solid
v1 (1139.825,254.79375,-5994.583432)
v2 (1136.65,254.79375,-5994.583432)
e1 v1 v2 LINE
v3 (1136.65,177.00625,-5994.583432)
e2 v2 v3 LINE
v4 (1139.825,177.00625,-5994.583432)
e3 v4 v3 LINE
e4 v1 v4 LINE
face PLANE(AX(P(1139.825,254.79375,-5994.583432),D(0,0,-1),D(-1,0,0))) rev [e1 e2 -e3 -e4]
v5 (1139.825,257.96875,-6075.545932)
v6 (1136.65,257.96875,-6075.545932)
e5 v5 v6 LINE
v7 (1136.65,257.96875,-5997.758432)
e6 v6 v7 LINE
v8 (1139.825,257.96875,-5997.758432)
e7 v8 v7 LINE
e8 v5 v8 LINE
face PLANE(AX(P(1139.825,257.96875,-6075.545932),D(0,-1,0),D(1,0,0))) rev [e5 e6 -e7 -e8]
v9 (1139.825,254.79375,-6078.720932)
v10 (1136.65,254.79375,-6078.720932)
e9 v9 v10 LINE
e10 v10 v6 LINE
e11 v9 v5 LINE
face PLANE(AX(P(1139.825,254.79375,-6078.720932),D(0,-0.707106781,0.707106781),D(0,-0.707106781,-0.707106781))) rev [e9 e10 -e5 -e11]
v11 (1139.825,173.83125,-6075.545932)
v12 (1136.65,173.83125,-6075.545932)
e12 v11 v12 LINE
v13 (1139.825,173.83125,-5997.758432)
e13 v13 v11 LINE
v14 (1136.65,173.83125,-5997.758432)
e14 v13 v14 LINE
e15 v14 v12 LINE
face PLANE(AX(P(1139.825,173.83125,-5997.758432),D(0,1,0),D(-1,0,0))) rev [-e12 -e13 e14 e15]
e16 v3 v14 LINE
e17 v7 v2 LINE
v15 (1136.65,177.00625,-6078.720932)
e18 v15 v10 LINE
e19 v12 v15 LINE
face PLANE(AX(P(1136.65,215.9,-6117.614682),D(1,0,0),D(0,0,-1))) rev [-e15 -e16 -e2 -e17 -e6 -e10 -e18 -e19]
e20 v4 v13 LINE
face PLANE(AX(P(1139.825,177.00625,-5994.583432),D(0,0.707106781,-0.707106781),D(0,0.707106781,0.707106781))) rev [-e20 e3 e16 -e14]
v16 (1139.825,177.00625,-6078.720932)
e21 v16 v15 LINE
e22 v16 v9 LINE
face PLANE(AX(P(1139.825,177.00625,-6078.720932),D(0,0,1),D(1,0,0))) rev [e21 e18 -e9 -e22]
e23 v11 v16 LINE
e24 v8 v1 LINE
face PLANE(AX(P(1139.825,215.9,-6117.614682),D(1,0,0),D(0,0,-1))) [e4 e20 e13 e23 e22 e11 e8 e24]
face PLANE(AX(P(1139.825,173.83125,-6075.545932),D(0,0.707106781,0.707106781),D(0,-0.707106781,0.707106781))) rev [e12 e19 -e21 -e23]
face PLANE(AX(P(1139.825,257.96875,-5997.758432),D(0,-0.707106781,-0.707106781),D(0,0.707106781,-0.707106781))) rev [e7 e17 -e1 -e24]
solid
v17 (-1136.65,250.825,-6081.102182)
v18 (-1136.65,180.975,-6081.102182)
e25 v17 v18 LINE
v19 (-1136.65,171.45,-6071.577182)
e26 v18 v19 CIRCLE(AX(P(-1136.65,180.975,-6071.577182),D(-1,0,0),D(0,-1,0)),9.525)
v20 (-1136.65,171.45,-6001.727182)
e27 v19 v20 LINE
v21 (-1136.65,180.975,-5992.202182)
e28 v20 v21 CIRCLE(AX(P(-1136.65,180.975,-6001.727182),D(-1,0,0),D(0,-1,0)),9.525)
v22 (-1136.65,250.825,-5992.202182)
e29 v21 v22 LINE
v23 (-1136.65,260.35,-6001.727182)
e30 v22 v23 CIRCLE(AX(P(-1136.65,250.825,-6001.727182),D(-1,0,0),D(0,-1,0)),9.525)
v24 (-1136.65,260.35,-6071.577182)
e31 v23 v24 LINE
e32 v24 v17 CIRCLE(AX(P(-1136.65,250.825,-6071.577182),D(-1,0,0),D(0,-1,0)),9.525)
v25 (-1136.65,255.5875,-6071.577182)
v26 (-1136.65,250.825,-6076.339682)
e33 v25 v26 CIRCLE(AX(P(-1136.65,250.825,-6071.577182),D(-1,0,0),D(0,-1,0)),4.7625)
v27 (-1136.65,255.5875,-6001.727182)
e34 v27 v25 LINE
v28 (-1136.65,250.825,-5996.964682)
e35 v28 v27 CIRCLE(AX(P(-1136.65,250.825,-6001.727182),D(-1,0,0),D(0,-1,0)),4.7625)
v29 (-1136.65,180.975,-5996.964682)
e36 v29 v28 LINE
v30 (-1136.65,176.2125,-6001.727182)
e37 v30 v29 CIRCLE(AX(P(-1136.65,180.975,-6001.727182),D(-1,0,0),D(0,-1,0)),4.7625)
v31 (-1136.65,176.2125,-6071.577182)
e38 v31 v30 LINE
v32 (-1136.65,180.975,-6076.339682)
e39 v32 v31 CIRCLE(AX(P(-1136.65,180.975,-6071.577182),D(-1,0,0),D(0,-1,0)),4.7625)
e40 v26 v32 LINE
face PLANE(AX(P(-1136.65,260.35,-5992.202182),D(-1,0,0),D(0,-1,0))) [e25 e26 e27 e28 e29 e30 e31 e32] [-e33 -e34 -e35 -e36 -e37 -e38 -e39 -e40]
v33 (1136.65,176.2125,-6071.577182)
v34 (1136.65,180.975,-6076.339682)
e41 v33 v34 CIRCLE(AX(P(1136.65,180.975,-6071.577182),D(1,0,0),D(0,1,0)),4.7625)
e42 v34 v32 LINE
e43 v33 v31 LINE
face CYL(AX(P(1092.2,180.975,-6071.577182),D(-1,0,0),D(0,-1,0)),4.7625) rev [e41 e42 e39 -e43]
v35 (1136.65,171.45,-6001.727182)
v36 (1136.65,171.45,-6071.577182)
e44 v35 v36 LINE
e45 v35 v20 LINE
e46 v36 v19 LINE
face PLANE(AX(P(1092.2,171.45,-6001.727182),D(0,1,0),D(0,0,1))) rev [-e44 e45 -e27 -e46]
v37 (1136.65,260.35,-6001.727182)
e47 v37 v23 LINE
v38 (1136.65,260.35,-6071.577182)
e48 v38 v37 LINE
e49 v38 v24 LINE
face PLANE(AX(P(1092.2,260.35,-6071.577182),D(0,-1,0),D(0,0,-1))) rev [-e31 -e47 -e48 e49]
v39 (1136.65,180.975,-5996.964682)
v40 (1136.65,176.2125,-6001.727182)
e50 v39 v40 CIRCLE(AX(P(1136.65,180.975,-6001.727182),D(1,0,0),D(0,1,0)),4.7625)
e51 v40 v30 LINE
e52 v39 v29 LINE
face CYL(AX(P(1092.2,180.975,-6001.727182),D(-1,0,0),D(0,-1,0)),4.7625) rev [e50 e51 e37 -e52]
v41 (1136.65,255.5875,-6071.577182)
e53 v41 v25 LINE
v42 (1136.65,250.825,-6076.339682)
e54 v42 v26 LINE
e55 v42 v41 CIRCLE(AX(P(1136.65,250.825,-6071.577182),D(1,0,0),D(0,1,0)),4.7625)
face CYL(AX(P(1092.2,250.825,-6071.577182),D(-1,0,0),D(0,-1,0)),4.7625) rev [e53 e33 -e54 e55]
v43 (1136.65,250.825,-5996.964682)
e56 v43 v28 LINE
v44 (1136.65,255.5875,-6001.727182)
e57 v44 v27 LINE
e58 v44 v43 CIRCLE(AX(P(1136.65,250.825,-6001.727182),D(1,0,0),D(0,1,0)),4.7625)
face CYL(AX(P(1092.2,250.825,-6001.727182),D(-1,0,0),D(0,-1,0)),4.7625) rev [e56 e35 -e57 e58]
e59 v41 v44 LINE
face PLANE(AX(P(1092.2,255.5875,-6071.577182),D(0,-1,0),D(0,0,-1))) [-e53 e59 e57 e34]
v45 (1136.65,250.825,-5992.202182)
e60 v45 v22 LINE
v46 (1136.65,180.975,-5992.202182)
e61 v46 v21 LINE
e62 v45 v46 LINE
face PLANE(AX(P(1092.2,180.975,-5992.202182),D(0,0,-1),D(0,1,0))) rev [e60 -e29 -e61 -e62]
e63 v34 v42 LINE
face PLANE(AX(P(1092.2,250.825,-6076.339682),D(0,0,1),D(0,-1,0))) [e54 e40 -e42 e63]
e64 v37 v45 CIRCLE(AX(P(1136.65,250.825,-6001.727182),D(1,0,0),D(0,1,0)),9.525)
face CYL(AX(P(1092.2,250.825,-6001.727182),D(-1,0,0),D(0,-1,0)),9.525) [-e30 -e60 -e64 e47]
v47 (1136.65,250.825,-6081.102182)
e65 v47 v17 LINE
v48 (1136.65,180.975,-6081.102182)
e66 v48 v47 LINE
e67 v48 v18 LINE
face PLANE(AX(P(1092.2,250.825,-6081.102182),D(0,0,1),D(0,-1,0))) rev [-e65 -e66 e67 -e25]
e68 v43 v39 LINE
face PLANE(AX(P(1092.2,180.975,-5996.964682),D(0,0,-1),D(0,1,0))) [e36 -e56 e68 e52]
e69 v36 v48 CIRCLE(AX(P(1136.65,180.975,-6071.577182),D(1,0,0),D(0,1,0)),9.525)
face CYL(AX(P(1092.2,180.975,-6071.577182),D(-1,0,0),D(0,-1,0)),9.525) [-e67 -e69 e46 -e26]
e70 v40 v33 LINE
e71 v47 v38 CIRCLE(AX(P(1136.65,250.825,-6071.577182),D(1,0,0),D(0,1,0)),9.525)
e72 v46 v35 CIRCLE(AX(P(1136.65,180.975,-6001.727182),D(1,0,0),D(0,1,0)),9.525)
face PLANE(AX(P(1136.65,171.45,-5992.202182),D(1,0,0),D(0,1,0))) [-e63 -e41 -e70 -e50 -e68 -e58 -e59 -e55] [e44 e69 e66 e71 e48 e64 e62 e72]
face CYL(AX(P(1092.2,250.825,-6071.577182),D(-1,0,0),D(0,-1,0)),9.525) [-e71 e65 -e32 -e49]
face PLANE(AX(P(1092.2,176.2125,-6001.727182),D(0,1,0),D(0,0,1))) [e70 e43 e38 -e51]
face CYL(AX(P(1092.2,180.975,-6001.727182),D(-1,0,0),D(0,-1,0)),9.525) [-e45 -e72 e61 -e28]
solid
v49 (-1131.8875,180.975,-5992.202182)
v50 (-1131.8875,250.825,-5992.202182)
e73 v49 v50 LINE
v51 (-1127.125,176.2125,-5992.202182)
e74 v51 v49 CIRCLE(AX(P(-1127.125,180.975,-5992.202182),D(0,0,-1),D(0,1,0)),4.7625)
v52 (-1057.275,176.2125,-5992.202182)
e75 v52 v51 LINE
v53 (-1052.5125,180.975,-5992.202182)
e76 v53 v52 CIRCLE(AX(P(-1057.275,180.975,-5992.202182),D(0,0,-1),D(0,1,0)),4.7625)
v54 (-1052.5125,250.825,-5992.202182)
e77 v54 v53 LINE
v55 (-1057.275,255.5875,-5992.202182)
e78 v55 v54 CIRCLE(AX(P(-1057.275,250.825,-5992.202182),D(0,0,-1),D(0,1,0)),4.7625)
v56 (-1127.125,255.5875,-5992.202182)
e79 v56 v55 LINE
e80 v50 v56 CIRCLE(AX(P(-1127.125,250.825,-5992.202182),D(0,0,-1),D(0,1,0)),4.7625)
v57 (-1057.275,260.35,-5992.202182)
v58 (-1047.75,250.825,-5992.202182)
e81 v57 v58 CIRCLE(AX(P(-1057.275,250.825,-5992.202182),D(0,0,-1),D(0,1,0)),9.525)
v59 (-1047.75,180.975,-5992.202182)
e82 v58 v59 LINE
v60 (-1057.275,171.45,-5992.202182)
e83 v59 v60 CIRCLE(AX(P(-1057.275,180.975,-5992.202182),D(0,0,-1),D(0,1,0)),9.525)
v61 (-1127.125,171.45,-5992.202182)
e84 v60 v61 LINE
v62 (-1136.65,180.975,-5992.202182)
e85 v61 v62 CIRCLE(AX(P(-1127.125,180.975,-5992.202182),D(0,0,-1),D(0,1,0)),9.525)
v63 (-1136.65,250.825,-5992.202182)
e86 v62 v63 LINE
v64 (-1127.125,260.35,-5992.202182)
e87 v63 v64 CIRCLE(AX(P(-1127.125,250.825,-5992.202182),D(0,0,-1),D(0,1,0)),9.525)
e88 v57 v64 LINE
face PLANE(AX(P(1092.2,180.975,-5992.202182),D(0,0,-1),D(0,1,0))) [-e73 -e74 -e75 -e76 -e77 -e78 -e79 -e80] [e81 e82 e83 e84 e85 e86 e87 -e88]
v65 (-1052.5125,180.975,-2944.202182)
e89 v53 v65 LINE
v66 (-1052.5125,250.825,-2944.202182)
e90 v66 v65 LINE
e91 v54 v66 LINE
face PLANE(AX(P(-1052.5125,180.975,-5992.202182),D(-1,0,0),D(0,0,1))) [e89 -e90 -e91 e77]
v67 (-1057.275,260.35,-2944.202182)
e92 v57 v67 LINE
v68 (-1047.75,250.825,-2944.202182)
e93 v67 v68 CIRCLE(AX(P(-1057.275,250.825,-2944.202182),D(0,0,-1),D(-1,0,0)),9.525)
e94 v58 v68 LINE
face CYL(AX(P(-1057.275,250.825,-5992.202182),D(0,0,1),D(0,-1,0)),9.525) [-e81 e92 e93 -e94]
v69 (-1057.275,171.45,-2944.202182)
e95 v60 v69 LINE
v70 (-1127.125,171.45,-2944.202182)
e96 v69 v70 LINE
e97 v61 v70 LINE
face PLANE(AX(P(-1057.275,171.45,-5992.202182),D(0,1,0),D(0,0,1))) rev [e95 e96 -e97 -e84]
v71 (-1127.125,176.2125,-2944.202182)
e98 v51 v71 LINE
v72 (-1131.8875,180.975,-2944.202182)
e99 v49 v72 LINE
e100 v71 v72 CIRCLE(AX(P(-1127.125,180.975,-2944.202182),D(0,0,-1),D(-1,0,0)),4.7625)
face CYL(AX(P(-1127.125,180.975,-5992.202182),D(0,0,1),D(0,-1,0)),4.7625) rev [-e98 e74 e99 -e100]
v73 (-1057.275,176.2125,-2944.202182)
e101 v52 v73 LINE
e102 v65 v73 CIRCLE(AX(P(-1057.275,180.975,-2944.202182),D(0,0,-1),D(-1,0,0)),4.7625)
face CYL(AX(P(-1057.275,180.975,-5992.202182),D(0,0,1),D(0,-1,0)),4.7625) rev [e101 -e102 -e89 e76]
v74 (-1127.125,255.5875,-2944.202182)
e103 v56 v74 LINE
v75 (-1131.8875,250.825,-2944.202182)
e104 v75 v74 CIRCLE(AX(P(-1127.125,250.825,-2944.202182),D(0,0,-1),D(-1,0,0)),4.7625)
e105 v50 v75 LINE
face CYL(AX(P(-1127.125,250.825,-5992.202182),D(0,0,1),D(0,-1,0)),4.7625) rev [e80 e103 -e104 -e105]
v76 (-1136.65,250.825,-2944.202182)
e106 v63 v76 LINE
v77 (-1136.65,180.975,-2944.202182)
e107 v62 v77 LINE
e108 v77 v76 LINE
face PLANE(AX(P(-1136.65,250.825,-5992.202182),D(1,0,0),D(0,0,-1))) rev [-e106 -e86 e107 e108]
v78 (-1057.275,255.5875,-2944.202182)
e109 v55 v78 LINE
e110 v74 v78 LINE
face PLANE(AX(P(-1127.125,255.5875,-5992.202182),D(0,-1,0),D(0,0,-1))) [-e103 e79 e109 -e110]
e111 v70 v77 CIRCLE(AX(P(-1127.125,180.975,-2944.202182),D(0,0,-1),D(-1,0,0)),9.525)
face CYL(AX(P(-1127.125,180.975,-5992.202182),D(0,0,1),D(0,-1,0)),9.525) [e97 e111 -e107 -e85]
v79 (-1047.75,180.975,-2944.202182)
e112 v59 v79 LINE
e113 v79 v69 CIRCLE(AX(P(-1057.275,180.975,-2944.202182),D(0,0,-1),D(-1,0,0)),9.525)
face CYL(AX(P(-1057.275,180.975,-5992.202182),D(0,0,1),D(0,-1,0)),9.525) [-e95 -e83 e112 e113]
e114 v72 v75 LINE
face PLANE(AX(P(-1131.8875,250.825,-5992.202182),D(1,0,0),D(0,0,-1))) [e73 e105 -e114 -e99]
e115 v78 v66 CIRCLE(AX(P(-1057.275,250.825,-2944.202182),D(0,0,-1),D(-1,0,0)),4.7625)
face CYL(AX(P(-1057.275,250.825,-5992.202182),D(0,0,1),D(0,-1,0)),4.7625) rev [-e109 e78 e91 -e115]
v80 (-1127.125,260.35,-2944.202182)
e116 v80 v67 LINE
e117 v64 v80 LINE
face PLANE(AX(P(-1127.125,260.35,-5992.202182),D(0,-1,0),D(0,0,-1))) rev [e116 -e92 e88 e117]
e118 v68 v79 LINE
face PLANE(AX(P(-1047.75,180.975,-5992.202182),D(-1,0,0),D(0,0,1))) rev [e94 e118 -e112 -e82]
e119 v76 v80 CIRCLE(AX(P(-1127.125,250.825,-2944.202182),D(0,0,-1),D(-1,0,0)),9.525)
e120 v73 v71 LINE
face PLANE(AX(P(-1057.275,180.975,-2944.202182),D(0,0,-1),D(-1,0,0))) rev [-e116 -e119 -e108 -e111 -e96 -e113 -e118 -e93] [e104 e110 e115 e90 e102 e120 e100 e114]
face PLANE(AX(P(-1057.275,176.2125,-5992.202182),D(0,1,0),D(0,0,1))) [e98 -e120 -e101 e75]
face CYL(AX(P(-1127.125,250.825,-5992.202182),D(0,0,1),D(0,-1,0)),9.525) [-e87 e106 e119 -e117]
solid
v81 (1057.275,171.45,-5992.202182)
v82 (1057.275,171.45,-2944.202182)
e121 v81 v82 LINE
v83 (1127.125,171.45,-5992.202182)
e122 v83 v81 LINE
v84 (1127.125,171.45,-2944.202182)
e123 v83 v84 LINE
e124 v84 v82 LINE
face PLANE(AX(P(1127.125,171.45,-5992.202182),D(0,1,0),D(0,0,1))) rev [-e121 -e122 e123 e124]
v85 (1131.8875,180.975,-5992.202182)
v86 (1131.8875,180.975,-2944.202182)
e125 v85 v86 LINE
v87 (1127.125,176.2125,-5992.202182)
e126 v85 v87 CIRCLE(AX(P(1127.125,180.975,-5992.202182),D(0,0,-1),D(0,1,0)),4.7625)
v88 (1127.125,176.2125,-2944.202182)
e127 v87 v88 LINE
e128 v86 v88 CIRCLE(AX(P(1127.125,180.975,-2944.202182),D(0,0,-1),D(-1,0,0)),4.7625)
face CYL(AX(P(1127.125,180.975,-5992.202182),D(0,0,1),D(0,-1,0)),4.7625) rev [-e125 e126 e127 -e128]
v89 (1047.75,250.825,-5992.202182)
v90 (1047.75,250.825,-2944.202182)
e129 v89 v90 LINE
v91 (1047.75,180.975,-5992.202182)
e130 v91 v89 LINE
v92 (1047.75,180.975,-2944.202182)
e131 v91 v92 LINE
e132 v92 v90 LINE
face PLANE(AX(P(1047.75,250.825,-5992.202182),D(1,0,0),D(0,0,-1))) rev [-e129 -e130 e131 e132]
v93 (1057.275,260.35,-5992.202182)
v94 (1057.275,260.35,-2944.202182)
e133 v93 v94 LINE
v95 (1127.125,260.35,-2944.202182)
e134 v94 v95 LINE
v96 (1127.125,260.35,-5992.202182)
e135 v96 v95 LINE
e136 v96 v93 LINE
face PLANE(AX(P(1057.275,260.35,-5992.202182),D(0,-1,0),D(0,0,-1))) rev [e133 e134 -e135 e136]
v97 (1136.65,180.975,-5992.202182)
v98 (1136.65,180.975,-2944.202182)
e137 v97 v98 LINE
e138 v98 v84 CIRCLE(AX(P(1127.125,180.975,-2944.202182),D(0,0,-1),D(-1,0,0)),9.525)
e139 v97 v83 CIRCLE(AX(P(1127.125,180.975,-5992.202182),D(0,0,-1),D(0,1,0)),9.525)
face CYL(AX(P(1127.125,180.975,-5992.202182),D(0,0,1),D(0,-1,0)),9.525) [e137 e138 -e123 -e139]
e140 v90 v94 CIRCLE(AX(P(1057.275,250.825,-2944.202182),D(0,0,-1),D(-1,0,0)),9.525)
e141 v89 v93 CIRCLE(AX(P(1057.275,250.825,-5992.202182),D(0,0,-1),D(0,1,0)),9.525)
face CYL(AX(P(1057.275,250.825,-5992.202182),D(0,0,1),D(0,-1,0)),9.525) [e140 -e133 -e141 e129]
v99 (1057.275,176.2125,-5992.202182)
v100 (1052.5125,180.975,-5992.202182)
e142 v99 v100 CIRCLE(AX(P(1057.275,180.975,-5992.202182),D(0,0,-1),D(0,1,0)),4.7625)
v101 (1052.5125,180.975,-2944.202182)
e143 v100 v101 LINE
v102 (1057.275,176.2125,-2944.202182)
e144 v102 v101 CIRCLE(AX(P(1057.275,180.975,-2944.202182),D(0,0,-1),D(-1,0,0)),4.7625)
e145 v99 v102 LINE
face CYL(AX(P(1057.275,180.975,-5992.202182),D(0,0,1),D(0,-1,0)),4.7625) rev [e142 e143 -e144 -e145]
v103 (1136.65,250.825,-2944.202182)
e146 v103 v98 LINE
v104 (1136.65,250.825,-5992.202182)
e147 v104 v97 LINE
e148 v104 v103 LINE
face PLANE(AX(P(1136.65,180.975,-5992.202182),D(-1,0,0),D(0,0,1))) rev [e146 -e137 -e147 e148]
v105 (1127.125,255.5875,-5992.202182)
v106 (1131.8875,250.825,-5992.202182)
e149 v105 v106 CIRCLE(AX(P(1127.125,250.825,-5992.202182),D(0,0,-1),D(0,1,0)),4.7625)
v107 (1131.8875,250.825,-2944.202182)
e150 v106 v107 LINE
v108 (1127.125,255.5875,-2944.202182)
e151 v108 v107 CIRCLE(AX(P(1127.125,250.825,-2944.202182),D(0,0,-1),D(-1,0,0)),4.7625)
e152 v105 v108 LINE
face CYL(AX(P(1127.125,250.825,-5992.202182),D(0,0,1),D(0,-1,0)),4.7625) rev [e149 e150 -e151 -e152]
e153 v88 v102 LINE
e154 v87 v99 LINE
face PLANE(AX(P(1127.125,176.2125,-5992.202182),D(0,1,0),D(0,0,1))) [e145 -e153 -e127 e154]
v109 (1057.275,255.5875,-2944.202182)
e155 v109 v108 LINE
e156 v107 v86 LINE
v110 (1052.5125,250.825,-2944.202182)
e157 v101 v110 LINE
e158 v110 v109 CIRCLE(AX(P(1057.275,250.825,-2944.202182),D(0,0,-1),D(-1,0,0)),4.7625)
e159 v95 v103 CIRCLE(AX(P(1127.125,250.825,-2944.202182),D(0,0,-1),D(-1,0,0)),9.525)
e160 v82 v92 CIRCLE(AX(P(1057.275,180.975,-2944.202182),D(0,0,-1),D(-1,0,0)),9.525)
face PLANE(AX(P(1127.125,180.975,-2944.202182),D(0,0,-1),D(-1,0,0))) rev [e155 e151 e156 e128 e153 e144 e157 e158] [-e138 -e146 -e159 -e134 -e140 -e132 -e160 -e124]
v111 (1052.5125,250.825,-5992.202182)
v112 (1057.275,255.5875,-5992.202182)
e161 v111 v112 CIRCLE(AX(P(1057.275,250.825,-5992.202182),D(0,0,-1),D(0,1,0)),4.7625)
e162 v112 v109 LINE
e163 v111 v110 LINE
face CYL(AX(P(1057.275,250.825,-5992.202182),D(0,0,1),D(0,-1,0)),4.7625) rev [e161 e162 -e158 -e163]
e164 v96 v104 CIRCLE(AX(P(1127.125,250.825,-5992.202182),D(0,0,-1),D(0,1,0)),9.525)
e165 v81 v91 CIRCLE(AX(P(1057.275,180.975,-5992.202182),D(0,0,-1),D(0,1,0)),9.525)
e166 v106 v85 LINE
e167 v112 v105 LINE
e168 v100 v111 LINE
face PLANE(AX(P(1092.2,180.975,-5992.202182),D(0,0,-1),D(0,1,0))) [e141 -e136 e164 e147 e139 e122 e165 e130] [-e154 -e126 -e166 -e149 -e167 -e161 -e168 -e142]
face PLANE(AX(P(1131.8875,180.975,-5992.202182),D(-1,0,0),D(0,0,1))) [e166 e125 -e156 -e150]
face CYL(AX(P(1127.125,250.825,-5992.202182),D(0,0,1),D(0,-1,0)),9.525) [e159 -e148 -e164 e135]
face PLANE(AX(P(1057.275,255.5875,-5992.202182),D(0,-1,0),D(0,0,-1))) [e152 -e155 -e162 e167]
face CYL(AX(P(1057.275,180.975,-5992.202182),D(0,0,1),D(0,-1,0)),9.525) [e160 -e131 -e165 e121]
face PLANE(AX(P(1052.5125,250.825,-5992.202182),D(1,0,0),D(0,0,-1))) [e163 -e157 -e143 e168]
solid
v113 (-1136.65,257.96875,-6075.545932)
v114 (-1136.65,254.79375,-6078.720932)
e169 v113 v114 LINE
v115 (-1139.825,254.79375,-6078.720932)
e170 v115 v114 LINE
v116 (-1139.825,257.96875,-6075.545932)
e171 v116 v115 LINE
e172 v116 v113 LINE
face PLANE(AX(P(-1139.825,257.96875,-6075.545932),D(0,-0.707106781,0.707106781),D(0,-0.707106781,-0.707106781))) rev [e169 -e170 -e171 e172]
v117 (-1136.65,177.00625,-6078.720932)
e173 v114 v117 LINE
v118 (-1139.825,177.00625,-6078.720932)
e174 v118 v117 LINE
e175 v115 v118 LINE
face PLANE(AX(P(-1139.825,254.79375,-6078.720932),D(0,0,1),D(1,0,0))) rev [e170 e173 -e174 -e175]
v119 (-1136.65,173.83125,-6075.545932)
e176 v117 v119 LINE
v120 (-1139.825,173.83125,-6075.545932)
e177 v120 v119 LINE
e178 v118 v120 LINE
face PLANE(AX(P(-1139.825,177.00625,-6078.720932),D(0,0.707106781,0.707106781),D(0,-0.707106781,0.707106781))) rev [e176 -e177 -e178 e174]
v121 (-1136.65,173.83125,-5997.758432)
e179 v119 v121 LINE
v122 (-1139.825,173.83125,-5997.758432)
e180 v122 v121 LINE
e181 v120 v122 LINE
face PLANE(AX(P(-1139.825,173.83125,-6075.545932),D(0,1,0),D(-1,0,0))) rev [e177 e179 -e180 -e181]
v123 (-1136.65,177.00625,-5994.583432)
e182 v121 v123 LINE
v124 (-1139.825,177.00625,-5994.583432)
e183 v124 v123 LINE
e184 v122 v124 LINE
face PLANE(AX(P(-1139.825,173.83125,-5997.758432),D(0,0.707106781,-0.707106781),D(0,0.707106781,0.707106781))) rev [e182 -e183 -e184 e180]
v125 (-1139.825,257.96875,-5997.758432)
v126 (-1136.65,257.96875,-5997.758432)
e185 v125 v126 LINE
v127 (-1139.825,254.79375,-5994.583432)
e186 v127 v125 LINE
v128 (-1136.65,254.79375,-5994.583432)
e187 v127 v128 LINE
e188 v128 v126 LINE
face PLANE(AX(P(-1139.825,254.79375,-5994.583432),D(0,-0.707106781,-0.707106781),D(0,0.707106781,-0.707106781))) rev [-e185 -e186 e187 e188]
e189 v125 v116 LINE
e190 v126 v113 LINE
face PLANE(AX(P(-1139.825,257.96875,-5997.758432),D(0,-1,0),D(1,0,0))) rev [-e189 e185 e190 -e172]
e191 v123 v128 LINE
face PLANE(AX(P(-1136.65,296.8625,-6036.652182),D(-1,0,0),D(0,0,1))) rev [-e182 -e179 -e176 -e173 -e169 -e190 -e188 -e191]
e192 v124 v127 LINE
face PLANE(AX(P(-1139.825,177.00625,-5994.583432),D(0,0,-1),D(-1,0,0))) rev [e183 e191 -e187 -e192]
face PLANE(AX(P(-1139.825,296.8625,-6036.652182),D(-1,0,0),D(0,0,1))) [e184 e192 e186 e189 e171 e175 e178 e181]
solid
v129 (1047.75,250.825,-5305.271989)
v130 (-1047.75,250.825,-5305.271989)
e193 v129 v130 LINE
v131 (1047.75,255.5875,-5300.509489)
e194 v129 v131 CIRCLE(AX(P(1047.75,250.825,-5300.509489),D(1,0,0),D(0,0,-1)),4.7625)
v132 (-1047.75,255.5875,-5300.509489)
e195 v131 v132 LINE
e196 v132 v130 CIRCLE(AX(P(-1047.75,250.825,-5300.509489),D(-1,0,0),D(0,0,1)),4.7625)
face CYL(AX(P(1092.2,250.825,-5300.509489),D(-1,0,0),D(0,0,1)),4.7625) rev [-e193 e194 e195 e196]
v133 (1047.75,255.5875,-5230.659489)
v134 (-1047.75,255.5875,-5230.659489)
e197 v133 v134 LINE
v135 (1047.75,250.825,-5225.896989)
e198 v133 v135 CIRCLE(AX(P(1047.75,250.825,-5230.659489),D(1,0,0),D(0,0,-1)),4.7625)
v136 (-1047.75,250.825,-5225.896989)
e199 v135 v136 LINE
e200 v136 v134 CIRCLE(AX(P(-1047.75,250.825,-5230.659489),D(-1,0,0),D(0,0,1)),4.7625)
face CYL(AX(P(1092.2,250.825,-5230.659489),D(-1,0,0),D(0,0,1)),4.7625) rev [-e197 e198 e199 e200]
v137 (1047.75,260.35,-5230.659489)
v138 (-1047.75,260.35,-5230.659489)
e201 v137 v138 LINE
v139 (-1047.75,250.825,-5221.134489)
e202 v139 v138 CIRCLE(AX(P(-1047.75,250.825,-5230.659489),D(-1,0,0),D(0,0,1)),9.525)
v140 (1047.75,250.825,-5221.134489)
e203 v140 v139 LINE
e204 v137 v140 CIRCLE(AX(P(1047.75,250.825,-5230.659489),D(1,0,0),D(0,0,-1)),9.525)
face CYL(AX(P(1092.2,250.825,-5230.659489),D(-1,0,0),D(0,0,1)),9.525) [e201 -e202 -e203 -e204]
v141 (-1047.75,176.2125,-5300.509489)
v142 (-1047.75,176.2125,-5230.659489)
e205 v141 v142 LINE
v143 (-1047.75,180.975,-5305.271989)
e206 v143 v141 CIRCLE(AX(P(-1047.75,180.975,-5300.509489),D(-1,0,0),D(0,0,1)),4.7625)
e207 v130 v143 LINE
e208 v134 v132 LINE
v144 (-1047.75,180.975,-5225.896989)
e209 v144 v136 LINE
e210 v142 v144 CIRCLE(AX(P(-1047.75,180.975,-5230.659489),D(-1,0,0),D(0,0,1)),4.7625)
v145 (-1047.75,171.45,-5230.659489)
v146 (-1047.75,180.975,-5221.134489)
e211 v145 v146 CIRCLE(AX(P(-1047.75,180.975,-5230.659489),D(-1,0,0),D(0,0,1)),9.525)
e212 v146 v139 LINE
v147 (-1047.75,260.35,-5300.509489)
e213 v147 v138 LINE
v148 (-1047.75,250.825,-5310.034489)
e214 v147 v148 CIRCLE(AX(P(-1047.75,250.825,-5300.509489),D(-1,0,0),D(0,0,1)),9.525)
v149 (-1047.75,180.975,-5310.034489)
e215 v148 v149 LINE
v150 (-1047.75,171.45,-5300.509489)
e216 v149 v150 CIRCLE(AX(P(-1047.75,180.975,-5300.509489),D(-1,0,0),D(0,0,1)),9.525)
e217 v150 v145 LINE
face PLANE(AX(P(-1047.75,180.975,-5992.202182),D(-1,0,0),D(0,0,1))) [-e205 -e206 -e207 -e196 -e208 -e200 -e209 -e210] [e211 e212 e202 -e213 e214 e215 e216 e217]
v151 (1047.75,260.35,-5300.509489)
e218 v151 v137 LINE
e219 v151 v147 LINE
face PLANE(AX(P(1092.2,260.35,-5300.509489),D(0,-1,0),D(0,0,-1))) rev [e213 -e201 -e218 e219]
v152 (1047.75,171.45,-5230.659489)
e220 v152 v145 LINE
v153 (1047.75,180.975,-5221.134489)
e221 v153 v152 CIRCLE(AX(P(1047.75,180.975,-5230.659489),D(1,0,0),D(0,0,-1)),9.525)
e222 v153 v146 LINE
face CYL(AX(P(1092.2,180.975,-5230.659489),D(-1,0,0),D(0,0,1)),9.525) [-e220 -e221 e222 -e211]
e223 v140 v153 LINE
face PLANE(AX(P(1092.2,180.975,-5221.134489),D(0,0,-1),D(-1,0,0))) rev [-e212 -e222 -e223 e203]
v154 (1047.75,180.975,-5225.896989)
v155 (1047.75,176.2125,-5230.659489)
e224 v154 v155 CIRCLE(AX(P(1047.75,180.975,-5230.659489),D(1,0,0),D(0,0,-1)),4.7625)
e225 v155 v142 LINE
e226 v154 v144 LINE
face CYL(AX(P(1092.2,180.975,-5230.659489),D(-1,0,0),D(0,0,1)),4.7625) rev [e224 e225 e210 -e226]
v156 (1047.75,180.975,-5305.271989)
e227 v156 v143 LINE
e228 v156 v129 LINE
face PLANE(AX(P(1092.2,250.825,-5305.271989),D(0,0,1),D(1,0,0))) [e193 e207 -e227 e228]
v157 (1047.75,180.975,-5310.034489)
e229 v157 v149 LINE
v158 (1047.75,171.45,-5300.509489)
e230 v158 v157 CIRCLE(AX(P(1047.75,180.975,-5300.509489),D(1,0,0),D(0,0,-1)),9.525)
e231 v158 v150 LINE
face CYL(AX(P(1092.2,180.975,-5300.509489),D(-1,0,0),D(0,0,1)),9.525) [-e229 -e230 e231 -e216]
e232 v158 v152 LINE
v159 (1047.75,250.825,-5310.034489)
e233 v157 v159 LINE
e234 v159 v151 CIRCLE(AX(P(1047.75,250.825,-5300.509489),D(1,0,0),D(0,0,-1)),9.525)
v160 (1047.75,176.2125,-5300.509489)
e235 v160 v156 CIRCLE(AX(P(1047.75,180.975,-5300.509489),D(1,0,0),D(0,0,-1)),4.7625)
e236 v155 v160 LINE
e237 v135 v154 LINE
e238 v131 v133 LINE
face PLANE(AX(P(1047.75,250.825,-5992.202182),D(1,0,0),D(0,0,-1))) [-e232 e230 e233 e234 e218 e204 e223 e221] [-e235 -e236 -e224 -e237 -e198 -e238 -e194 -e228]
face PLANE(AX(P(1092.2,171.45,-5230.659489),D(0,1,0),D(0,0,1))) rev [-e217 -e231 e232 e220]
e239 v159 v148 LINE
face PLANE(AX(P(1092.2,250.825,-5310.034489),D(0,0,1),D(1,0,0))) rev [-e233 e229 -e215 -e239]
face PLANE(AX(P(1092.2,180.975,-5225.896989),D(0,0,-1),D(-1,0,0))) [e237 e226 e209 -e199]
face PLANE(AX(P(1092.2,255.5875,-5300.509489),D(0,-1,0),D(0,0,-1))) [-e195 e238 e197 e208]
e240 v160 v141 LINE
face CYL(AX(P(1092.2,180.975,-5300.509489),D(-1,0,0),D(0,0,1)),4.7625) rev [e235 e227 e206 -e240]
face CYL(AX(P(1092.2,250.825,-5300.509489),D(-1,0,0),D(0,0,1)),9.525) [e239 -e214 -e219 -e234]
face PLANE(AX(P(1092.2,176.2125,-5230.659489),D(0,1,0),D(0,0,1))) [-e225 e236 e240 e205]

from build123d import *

# Parameters (mm, degrees)
EXTENSION_START          = -1047.75
EXTENSION_MIDDLE_DEPTH   = 2095.5
EXTENSION_START_2        = -1136.65
EXTENSION_MIDDLE_2_DEPTH = 2273.3
EXTENSION_START_3        = -5992.202181603
EXTENSION_MIDDLE_3_DEPTH = 3048
END_CAPS_WIDTH           = 84.1375
END_CAPS_HEIGHT          = 84.1375
END_CAPS_THICKNESS       = 3.175
END_CAPS_2_SIZE          = 3.175
END_CAPS_4_WIDTH         = 84.1375
END_CAPS_4_HEIGHT        = 84.1375
END_CAPS_4_THICKNESS     = 3.175
END_CAPS_5_SIZE          = 3.175


# Read off the part's stored shape, not the designer's step: extension middle
with BuildPart() as part:
    # extension middle outline → extension middle (new body)
    # profile 1 of 2: a face of its own
    with BuildSketch(Plane.YZ.offset(EXTENSION_START)):
        with BuildLine():
            ThreePointArc((250.825, -6081.102181603), (257.560192091, -6078.312373694), (260.35, -6071.577181603))
            Line((260.35, -6071.577181603), (260.35, -6001.727181603))
            ThreePointArc((260.35, -6001.727181603), (257.560192091, -5994.991989512), (250.825, -5992.202181603))
            Line((250.825, -5992.202181603), (180.975, -5992.202181603))
            ThreePointArc((180.975, -5992.202181603), (174.239807909, -5994.991989512), (171.45, -6001.727181603))
            Line((171.45, -6001.727181603), (171.45, -6071.577181603))
            ThreePointArc((171.45, -6071.577181603), (174.239807909, -6078.312373694), (180.975, -6081.102181603))
            Line((180.975, -6081.102181603), (250.825, -6081.102181603))
        make_face()
        with BuildLine():
            Line((180.975, -5996.964681603), (250.825, -5996.964681603))
            ThreePointArc((250.825, -5996.964681603), (254.192596045, -5998.359585558), (255.5875, -6001.727181603))
            Line((255.5875, -6001.727181603), (255.5875, -6071.577181603))
            ThreePointArc((255.5875, -6071.577181603), (254.192596045, -6074.944777649), (250.825, -6076.339681603))
            Line((250.825, -6076.339681603), (180.975, -6076.339681603))
            ThreePointArc((180.975, -6076.339681603), (177.607403955, -6074.944777649), (176.2125, -6071.577181603))
            Line((176.2125, -6071.577181603), (176.2125, -6001.727181603))
            ThreePointArc((176.2125, -6001.727181603), (177.607403955, -5998.359585558), (180.975, -5996.964681603))
        make_face(mode=Mode.SUBTRACT)
    # profile 2 of 2: a face of its own
    with BuildSketch(Plane.YZ.offset(EXTENSION_START)):
        with BuildLine():
            Line((180.975, -5310.034488622), (250.825, -5310.034488622))
            ThreePointArc((250.825, -5310.034488622), (257.560192091, -5307.244680713), (260.35, -5300.509488622))
            Line((260.35, -5300.509488622), (260.35, -5230.659488622))
            ThreePointArc((260.35, -5230.659488622), (257.560192091, -5223.924296531), (250.825, -5221.134488622))
            Line((250.825, -5221.134488622), (180.975, -5221.134488622))
            ThreePointArc((180.975, -5221.134488622), (174.239807909, -5223.924296531), (171.45, -5230.659488622))
            Line((171.45, -5230.659488622), (171.45, -5300.509488622))
            ThreePointArc((171.45, -5300.509488622), (174.239807909, -5307.244680713), (180.975, -5310.034488622))
        make_face()
        with BuildLine():
            ThreePointArc((176.2125, -5230.659488622), (177.607403955, -5227.291892577), (180.975, -5225.896988622))
            Line((180.975, -5225.896988622), (250.825, -5225.896988622))
            ThreePointArc((250.825, -5225.896988622), (254.192596045, -5227.291892577), (255.5875, -5230.659488622))
            Line((255.5875, -5230.659488622), (255.5875, -5300.509488622))
            ThreePointArc((255.5875, -5300.509488622), (254.192596045, -5303.877084667), (250.825, -5305.271988622))
            Line((250.825, -5305.271988622), (180.975, -5305.271988622))
            ThreePointArc((180.975, -5305.271988622), (177.607403955, -5303.877084667), (176.2125, -5300.509488622))
            Line((176.2125, -5300.509488622), (176.2125, -5230.659488622))
        make_face(mode=Mode.SUBTRACT)
    extrude(amount=EXTENSION_MIDDLE_DEPTH)

    # extension middle 2 outline → extension middle 2 (add)
    with BuildSketch(Plane.YZ.offset(EXTENSION_START_2)):
        with BuildLine():
            ThreePointArc((250.825, -6081.102181603), (257.560192091, -6078.312373694), (260.35, -6071.577181603))
            Line((260.35, -6071.577181603), (260.35, -6001.727181603))
            ThreePointArc((260.35, -6001.727181603), (257.560192091, -5994.991989512), (250.825, -5992.202181603))
            Line((250.825, -5992.202181603), (180.975, -5992.202181603))
            ThreePointArc((180.975, -5992.202181603), (174.239807909, -5994.991989512), (171.45, -6001.727181603))
            Line((171.45, -6001.727181603), (171.45, -6071.577181603))
            ThreePointArc((171.45, -6071.577181603), (174.239807909, -6078.312373694), (180.975, -6081.102181603))
            Line((180.975, -6081.102181603), (250.825, -6081.102181603))
        make_face()
        with BuildLine():
            Line((180.975, -5996.964681603), (250.825, -5996.964681603))
            ThreePointArc((250.825, -5996.964681603), (254.192596045, -5998.359585558), (255.5875, -6001.727181603))
            Line((255.5875, -6001.727181603), (255.5875, -6071.577181603))
            ThreePointArc((255.5875, -6071.577181603), (254.192596045, -6074.944777649), (250.825, -6076.339681603))
            Line((250.825, -6076.339681603), (180.975, -6076.339681603))
            ThreePointArc((180.975, -6076.339681603), (177.607403955, -6074.944777649), (176.2125, -6071.577181603))
            Line((176.2125, -6071.577181603), (176.2125, -6001.727181603))
            ThreePointArc((176.2125, -6001.727181603), (177.607403955, -5998.359585558), (180.975, -5996.964681603))
        make_face(mode=Mode.SUBTRACT)
    extrude(amount=EXTENSION_MIDDLE_2_DEPTH)


with BuildPart() as body_2:
    # extension middle 3 outline → extension middle 3 (new body)
    # profile 1 of 2: a face of its own
    with BuildSketch(Plane.XY.offset(EXTENSION_START_3)):
        with BuildLine():
            Line((1136.65, 180.975), (1136.65, 250.825))
            ThreePointArc((1136.65, 250.825), (1133.860192091, 257.560192091), (1127.125, 260.35))
            Line((1127.125, 260.35), (1057.275, 260.35))
            ThreePointArc((1057.275, 260.35), (1050.539807909, 257.560192091), (1047.75, 250.825))
            Line((1047.75, 250.825), (1047.75, 180.975))
            ThreePointArc((1047.75, 180.975), (1050.539807909, 174.239807909), (1057.275, 171.45))
            Line((1057.275, 171.45), (1127.125, 171.45))
            ThreePointArc((1127.125, 171.45), (1133.860192091, 174.239807909), (1136.65, 180.975))
        make_face()
        with BuildLine():
            ThreePointArc((1057.275, 176.2125), (1053.907403955, 177.607403955), (1052.5125, 180.975))
            Line((1052.5125, 180.975), (1052.5125, 250.825))
            ThreePointArc((1052.5125, 250.825), (1053.907403955, 254.192596045), (1057.275, 255.5875))
            Line((1057.275, 255.5875), (1127.125, 255.5875))
            ThreePointArc((1127.125, 255.5875), (1130.492596045, 254.192596045), (1131.8875, 250.825))
            Line((1131.8875, 250.825), (1131.8875, 180.975))
            ThreePointArc((1131.8875, 180.975), (1130.492596045, 177.607403955), (1127.125, 176.2125))
            Line((1127.125, 176.2125), (1057.275, 176.2125))
        make_face(mode=Mode.SUBTRACT)
    # profile 2 of 2: a face of its own
    with BuildSketch(Plane.XY.offset(EXTENSION_START_3)):
        with BuildLine():
            Line((-1047.75, 180.975), (-1047.75, 250.825))
            ThreePointArc((-1047.75, 250.825), (-1050.539807909, 257.560192091), (-1057.275, 260.35))
            Line((-1057.275, 260.35), (-1127.125, 260.35))
            ThreePointArc((-1127.125, 260.35), (-1133.860192091, 257.560192091), (-1136.65, 250.825))
            Line((-1136.65, 250.825), (-1136.65, 180.975))
            ThreePointArc((-1136.65, 180.975), (-1133.860192091, 174.239807909), (-1127.125, 171.45))
            Line((-1127.125, 171.45), (-1057.275, 171.45))
            ThreePointArc((-1057.275, 171.45), (-1050.539807909, 174.239807909), (-1047.75, 180.975))
        make_face()
        with BuildLine():
            ThreePointArc((-1127.125, 176.2125), (-1130.492596045, 177.607403955), (-1131.8875, 180.975))
            Line((-1131.8875, 180.975), (-1131.8875, 250.825))
            ThreePointArc((-1131.8875, 250.825), (-1130.492596045, 254.192596045), (-1127.125, 255.5875))
            Line((-1127.125, 255.5875), (-1057.275, 255.5875))
            ThreePointArc((-1057.275, 255.5875), (-1053.907403955, 254.192596045), (-1052.5125, 250.825))
            Line((-1052.5125, 250.825), (-1052.5125, 180.975))
            ThreePointArc((-1052.5125, 180.975), (-1053.907403955, 177.607403955), (-1057.275, 176.2125))
            Line((-1057.275, 176.2125), (-1127.125, 176.2125))
        make_face(mode=Mode.SUBTRACT)
    extrude(amount=EXTENSION_MIDDLE_3_DEPTH)


with BuildPart() as body_3:
    # end_caps: an end cap: a rectangular plate 3.175 thick over the member's open end
    with BuildSketch(Plane(origin=(1136.65, 215.9, -6036.652181603), x_dir=(0, 0, 1), z_dir=(1, 0, 0))):
        Rectangle(END_CAPS_WIDTH, END_CAPS_HEIGHT)
    extrude(amount=END_CAPS_THICKNESS)

    # end_caps 2
    end_caps_2_edges = [body_3.edges().sort_by_distance(p)[0] for p in [
        (1138.2375, 257.96875, -6078.720931603),
        (1138.2375, 173.83125, -6078.720931603),
        (1138.2375, 257.96875, -5994.583431603),
        (1138.2375, 173.83125, -5994.583431603),
    ]]
    chamfer(end_caps_2_edges, length=END_CAPS_2_SIZE)


with BuildPart() as body_4:
    # end_caps 4: an end cap: a rectangular plate 3.175 thick over the member's open end
    with BuildSketch(Plane(origin=(-1136.65, 215.9, -6036.652181603), x_dir=(0, 0, 1), z_dir=(-1, 0, 0))):
        Rectangle(END_CAPS_4_WIDTH, END_CAPS_4_HEIGHT)
    extrude(amount=END_CAPS_4_THICKNESS)

    # end_caps 5
    end_caps_5_edges = [body_4.edges().sort_by_distance(p)[0] for p in [
        (-1138.2375, 173.83125, -6078.720931603),
        (-1138.2375, 257.96875, -6078.720931603),
        (-1138.2375, 173.83125, -5994.583431603),
        (-1138.2375, 257.96875, -5994.583431603),
    ]]
    chamfer(end_caps_5_edges, length=END_CAPS_5_SIZE)


solid = Compound([part.part, body_2.part, body_3.part, body_4.part])
